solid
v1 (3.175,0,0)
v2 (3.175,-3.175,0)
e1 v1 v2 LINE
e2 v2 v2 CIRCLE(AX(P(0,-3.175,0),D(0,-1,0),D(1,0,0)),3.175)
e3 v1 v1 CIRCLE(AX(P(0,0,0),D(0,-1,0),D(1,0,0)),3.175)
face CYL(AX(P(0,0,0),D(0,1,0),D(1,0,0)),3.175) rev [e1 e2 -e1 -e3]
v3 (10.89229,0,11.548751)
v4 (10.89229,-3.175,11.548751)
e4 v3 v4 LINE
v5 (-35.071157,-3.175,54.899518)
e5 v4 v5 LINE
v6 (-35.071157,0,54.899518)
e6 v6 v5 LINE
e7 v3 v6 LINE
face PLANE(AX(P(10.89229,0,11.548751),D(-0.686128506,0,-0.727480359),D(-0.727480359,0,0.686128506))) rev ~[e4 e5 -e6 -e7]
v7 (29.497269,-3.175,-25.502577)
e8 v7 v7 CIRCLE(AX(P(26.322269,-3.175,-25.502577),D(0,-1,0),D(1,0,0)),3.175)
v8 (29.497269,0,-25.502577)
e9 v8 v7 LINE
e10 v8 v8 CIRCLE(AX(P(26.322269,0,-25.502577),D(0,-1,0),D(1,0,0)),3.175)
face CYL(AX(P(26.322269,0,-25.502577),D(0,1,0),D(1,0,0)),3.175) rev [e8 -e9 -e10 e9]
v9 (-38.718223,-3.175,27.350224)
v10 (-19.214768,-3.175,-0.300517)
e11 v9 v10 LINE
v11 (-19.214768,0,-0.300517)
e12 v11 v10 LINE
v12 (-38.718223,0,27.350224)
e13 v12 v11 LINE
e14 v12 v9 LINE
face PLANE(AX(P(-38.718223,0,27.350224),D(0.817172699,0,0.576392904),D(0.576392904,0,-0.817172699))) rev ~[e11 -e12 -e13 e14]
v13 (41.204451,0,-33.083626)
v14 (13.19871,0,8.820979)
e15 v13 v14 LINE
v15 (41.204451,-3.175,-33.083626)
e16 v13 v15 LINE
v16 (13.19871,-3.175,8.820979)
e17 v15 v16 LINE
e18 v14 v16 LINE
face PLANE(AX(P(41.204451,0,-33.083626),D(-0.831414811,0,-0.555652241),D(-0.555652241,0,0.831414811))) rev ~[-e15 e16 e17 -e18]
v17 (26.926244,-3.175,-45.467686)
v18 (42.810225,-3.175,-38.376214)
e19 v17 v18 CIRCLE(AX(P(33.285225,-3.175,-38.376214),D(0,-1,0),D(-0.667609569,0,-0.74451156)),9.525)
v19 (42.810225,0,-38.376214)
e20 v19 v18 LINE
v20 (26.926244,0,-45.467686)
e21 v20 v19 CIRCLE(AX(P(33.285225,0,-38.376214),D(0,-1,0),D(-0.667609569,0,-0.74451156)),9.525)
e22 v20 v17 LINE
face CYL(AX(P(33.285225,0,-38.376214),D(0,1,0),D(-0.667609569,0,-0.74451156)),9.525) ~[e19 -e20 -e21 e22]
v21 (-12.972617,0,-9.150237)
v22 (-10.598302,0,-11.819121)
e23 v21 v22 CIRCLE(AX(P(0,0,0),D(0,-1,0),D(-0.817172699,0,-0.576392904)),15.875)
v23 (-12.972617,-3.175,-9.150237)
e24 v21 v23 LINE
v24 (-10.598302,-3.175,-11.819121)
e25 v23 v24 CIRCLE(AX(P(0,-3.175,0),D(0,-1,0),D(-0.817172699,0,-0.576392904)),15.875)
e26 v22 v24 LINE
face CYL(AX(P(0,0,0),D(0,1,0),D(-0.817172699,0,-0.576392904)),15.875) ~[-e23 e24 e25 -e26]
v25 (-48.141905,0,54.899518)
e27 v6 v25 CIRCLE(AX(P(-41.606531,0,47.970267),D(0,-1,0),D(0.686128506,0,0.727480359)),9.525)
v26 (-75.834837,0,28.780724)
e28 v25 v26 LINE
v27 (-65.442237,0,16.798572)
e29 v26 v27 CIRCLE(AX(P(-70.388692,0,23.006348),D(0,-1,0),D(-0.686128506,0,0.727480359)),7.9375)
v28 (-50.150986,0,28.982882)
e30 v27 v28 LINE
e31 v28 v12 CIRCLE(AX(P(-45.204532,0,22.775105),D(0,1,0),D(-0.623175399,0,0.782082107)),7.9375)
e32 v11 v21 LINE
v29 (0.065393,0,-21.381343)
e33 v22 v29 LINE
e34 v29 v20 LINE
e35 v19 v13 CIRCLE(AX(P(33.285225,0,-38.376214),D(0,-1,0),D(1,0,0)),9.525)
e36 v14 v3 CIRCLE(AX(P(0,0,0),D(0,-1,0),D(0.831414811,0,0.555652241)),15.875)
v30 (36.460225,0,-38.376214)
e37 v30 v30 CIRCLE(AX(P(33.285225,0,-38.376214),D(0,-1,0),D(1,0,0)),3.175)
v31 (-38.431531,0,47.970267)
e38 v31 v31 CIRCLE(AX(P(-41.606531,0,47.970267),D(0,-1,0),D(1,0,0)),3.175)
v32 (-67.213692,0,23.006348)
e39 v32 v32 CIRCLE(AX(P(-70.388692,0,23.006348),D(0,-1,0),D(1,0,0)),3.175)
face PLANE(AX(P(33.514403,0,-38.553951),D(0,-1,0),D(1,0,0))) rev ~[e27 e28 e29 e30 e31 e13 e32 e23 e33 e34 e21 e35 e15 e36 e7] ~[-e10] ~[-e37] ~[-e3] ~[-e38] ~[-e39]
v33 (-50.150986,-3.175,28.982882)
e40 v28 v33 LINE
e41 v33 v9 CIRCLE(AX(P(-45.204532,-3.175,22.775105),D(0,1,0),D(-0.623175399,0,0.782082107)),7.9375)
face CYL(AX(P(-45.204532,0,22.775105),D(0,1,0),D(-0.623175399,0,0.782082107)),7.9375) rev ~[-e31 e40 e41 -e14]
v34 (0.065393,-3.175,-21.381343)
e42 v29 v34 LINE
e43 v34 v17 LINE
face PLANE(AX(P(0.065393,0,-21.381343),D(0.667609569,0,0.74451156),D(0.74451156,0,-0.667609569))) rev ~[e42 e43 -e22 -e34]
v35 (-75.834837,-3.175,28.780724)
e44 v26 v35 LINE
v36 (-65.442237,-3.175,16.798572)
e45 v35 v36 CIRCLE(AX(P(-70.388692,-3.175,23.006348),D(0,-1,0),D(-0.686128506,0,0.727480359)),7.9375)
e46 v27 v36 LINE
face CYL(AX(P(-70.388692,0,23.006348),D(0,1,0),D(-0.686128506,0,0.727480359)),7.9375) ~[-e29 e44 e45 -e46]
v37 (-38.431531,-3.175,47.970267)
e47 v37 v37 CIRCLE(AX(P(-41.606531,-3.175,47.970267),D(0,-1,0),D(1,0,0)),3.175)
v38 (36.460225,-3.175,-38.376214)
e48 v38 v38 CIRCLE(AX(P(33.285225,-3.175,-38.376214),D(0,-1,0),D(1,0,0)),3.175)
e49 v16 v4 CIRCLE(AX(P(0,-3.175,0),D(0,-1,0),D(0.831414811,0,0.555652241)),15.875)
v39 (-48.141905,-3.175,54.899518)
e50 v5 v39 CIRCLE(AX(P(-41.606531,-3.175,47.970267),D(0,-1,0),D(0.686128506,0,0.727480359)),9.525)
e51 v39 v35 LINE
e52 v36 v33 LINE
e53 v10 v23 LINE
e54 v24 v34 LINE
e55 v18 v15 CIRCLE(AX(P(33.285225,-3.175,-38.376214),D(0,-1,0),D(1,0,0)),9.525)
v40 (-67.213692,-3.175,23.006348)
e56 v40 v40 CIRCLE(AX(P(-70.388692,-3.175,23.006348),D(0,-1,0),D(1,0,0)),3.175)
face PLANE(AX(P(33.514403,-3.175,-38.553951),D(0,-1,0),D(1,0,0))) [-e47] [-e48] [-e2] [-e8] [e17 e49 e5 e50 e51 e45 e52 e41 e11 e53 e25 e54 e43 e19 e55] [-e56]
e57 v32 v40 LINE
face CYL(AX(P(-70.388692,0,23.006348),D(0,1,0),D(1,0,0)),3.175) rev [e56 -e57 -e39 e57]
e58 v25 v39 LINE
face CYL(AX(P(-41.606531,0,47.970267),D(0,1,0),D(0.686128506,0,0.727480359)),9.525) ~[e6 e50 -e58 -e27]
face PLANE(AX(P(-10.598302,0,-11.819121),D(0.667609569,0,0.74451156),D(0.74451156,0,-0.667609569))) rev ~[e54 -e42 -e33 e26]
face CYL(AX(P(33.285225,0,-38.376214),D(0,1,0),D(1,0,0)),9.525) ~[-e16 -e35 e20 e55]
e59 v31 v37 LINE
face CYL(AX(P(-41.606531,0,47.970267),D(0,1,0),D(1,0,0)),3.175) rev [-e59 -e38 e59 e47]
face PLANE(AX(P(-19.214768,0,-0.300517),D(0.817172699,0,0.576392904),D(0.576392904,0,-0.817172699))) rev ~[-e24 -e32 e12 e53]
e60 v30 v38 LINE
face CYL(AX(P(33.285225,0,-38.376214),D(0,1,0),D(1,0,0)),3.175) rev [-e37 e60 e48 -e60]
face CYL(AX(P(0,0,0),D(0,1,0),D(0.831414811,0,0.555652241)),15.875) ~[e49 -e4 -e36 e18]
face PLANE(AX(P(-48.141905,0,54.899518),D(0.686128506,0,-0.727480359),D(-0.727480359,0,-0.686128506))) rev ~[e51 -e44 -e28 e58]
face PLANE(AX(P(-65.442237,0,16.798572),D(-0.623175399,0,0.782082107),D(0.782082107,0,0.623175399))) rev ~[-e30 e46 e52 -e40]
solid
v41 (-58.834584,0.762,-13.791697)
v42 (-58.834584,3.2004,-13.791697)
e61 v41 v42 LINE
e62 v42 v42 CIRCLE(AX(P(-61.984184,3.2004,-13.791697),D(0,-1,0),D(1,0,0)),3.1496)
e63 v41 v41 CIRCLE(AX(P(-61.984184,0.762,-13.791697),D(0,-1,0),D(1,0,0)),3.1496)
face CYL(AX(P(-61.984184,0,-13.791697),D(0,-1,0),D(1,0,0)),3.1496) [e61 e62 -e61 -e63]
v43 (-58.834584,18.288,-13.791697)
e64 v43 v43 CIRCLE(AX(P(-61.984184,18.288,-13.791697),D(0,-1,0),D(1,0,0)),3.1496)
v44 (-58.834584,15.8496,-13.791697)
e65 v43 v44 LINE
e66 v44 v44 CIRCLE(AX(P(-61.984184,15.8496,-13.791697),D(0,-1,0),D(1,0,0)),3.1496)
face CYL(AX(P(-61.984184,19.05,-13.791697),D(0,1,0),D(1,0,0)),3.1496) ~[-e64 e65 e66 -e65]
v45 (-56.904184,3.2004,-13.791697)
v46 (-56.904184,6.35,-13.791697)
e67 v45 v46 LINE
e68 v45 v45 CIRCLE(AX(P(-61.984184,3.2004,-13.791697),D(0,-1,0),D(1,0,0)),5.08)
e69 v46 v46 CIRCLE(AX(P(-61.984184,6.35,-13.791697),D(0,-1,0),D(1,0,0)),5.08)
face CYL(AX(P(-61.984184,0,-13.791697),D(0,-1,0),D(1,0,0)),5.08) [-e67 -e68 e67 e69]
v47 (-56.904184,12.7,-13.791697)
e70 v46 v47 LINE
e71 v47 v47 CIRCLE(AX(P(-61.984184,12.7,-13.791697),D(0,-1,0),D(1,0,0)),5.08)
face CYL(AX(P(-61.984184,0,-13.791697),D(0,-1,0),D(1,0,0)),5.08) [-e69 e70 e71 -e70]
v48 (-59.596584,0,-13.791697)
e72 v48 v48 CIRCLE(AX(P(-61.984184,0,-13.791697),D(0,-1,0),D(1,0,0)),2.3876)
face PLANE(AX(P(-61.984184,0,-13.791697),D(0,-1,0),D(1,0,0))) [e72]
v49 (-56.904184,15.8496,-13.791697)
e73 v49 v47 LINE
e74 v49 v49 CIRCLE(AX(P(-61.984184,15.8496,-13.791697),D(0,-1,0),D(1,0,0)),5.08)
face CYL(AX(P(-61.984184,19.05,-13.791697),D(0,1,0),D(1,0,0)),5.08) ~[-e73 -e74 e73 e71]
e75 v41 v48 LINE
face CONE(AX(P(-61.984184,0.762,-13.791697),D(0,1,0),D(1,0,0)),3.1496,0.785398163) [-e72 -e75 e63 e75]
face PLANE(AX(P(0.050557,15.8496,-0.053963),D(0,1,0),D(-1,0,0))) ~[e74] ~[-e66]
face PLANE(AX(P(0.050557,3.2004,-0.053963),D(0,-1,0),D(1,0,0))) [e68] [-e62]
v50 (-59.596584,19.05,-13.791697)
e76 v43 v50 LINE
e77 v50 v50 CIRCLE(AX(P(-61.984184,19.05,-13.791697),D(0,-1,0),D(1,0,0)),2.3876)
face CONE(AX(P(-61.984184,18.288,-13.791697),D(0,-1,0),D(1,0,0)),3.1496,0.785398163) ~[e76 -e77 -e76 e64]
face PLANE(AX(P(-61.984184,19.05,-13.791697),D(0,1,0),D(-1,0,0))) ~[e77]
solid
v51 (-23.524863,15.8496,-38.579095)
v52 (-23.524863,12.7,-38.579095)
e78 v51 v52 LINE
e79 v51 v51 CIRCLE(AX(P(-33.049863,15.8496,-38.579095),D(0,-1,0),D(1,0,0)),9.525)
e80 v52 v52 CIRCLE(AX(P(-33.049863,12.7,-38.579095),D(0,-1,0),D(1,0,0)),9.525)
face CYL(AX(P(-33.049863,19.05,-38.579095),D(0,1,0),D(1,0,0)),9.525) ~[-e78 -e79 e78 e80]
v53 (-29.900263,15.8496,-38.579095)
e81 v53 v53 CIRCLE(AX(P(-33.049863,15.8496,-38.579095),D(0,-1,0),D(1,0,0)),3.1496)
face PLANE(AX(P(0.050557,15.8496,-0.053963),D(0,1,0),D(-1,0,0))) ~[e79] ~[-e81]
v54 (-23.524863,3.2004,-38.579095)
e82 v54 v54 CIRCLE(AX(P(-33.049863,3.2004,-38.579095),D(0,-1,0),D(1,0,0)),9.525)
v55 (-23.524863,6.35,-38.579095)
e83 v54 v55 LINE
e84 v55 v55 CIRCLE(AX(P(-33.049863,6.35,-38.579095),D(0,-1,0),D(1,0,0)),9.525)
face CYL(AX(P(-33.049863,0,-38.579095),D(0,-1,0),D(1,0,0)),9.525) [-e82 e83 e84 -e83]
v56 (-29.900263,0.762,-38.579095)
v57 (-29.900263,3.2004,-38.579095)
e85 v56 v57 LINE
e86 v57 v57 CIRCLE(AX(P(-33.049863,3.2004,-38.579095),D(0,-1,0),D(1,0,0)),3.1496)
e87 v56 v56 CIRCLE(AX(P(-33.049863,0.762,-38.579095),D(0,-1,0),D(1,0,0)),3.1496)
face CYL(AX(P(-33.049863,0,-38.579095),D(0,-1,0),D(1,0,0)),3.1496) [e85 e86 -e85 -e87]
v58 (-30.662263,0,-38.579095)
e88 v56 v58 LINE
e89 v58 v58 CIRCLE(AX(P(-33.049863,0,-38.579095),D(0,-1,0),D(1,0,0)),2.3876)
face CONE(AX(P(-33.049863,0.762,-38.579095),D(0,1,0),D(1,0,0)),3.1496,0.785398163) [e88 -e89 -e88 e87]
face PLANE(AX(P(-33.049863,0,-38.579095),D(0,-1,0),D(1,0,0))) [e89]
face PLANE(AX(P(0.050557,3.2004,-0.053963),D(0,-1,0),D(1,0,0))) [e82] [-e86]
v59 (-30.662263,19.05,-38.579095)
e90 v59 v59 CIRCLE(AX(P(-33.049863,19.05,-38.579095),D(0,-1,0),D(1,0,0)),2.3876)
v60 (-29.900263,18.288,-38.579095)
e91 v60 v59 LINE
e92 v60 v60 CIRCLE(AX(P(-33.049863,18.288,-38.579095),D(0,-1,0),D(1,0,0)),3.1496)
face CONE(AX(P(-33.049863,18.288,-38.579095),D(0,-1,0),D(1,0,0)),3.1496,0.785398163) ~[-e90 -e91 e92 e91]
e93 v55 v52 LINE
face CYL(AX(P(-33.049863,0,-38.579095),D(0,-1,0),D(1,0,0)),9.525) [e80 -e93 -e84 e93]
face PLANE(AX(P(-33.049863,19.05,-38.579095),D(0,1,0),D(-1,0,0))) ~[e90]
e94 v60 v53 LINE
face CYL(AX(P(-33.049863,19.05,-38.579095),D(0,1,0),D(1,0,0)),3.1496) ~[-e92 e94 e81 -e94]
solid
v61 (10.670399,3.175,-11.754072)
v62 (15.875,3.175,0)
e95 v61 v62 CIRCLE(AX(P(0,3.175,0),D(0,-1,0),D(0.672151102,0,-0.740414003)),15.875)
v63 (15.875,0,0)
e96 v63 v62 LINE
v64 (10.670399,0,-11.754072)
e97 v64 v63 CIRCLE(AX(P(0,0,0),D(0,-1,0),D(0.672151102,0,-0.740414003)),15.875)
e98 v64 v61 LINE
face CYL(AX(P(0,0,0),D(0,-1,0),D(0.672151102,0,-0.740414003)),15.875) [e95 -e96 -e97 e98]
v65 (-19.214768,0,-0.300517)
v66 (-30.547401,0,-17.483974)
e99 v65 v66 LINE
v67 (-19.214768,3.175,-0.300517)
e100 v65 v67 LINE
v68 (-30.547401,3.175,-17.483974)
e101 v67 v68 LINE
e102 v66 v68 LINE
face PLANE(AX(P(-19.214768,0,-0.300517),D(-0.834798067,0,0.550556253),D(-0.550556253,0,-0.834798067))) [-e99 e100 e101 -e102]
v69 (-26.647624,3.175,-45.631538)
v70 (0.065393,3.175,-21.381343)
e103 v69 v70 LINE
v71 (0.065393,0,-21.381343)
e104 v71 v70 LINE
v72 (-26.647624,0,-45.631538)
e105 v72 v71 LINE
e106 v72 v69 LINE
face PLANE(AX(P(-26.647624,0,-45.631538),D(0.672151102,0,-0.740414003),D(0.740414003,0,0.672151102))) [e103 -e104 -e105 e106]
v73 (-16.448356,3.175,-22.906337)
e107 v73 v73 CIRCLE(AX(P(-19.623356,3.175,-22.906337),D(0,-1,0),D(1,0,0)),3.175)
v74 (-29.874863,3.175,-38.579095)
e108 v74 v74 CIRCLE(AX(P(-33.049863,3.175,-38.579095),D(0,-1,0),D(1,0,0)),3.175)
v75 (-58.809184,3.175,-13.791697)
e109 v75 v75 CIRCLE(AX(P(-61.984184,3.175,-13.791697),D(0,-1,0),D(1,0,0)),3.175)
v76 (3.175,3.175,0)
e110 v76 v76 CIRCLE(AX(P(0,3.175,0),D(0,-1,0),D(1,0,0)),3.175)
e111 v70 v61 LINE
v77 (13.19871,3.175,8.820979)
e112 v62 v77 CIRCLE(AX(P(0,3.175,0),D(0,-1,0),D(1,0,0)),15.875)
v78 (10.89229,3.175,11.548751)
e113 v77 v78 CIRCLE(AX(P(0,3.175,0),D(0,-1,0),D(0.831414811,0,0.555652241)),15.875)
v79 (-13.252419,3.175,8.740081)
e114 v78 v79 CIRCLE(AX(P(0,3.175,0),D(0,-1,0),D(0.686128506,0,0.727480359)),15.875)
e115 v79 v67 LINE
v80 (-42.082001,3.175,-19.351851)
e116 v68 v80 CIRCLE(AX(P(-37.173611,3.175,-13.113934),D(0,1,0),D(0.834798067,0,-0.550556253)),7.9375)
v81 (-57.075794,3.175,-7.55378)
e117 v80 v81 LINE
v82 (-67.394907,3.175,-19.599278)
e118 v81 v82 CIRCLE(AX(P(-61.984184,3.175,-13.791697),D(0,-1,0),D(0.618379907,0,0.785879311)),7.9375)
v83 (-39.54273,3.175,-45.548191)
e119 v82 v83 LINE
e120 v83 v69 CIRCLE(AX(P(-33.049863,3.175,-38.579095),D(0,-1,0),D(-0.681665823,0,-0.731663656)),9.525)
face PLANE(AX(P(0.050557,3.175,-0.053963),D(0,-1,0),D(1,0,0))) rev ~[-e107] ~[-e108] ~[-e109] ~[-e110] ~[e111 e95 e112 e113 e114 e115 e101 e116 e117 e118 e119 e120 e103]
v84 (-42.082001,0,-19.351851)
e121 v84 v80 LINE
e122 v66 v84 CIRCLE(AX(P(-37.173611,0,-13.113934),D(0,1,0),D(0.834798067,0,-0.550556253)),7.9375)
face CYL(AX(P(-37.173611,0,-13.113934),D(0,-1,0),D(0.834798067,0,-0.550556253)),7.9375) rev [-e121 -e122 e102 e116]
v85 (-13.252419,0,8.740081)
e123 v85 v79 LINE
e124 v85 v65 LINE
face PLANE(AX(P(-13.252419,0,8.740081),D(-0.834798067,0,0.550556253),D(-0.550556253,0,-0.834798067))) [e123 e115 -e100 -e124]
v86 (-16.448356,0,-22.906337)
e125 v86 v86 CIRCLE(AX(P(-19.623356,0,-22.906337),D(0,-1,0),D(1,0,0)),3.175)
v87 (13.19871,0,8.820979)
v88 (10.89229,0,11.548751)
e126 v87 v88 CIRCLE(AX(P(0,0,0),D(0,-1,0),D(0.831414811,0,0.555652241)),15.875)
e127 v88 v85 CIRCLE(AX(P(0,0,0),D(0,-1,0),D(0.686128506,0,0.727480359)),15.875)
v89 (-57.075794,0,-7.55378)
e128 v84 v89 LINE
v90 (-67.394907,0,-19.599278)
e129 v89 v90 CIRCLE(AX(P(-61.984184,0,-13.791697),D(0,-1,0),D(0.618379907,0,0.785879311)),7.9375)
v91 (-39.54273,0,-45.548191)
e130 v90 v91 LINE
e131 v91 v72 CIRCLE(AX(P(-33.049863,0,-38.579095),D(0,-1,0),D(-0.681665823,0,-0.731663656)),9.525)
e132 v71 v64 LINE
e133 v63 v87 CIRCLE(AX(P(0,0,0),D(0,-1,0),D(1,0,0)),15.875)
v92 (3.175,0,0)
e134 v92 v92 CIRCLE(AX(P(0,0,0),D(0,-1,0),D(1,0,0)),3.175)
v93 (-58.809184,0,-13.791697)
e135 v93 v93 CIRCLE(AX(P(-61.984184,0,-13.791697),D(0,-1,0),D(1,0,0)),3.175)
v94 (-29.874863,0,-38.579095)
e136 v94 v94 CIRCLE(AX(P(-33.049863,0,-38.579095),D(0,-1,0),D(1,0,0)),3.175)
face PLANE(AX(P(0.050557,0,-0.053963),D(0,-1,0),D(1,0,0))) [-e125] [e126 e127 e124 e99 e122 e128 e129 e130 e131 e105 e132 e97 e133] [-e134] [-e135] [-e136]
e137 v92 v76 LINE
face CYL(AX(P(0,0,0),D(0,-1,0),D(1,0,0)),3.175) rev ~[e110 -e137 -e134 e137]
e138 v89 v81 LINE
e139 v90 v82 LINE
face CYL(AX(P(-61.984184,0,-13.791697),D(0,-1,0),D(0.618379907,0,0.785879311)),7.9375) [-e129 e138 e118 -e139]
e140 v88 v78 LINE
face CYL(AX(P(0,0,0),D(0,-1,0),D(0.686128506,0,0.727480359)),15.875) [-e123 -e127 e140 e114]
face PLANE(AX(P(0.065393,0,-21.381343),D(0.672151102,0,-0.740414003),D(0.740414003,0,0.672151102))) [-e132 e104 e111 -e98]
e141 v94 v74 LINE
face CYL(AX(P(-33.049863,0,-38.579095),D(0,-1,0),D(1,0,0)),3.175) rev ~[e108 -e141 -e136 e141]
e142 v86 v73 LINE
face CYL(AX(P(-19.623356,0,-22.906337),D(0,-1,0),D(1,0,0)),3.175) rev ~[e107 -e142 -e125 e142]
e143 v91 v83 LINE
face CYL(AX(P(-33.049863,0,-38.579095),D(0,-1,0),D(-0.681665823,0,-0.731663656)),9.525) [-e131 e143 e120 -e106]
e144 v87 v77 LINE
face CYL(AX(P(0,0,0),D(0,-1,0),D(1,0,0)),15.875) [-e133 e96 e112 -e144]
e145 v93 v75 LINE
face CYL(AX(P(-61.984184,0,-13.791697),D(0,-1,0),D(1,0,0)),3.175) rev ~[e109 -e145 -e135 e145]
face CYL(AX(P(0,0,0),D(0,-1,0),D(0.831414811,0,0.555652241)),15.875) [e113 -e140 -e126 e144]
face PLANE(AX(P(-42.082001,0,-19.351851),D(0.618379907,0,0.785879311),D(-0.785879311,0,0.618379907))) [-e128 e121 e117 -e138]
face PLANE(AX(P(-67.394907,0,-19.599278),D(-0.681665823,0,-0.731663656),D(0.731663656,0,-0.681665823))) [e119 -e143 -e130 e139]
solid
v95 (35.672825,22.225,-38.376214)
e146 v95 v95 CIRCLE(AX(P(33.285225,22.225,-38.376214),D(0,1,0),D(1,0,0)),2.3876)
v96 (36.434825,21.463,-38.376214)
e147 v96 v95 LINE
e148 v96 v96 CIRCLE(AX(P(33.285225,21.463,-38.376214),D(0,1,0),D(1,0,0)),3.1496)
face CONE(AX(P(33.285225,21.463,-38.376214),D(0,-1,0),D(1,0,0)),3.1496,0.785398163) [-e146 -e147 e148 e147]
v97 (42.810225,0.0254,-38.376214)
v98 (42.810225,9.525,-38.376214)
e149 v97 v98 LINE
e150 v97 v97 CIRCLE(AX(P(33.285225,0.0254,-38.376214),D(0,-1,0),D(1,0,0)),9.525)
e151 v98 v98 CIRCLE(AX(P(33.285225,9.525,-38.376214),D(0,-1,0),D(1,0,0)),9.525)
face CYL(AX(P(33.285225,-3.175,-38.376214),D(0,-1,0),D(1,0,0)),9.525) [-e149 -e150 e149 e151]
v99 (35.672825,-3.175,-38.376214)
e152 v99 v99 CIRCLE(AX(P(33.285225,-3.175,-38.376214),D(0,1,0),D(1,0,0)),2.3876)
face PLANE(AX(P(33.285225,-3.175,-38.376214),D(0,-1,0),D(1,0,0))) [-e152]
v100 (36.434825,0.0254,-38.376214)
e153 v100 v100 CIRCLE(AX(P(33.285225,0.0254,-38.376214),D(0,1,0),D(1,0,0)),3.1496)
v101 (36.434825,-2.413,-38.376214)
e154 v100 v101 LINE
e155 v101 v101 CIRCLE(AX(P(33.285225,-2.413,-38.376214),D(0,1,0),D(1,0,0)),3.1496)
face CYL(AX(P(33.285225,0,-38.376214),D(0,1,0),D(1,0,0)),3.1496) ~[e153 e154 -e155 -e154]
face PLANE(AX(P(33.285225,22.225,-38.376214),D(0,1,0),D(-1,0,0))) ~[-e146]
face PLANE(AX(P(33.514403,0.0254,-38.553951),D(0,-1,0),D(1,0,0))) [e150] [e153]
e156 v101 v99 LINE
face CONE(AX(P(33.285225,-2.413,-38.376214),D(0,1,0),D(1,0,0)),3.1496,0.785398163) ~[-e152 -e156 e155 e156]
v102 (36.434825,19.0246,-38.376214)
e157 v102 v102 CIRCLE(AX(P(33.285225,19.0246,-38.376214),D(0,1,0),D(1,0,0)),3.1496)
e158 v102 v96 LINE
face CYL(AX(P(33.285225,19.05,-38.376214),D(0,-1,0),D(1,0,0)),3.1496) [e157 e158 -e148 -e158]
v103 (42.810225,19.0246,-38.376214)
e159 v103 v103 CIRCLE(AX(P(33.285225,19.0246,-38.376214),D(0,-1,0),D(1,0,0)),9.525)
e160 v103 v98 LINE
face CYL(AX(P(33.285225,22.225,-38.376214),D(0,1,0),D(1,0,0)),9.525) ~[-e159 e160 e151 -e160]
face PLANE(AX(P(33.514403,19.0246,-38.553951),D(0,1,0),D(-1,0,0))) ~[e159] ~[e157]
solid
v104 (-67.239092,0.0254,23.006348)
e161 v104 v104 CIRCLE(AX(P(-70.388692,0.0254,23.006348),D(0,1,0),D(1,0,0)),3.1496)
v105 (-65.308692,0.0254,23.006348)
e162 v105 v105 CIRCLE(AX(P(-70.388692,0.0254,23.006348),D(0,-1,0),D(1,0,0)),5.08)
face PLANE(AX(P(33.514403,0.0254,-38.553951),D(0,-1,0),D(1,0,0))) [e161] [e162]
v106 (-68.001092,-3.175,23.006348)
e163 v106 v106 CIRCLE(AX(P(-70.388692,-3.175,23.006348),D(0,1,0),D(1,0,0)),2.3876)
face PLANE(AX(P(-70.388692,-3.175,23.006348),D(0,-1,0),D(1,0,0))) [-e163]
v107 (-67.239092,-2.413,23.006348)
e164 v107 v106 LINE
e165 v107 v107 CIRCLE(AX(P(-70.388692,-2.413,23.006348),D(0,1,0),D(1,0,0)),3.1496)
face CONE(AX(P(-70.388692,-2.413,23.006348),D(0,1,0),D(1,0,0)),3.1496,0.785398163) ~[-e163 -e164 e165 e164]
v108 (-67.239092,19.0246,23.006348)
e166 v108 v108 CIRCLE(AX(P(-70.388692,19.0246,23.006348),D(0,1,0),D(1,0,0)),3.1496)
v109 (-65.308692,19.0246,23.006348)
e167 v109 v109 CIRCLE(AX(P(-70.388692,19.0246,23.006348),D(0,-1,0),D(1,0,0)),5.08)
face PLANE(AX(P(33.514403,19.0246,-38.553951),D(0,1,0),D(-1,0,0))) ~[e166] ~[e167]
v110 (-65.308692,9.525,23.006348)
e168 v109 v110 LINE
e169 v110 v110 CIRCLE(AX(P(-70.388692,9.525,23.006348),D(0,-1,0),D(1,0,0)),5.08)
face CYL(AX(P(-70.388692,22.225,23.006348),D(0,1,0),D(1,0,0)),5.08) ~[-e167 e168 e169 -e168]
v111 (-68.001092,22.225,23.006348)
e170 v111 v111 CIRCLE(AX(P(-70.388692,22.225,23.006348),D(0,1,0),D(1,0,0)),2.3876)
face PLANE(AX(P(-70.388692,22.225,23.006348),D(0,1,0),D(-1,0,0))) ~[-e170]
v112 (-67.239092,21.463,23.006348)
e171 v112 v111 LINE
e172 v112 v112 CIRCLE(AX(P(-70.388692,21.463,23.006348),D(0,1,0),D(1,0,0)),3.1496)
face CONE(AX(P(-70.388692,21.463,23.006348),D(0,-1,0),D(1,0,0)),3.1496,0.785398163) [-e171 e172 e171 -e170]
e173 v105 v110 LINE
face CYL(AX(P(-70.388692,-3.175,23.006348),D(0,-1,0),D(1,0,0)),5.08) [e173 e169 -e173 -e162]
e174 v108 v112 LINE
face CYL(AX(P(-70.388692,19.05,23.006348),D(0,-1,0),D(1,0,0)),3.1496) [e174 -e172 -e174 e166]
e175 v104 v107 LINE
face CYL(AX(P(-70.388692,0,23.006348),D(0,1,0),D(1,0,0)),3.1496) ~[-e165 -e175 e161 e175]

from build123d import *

# Parameters (mm, degrees)
F0_R      = 3.175
F0_R_2    = 3.96875
F2_DEPTH  = 3.175
F3_DEPTH  = 3.175
F4_R      = 9.525
F6_DEPTH  = 12.7
F4_R_2    = 5.08
F5_R      = 9.525
F5_R_2    = 5.08
F7_OFFSET = 0.0254
F8_SIZE   = 0.762
F8_2_SIZE = 0.762
F8_3_SIZE = 0.762
F8_4_SIZE = 0.762


with BuildPart() as f2:
    # F0 (on Front) → F2 (new body)
    with BuildSketch(Plane.XZ):
        with BuildLine():
            ThreePointArc((26.9262440233, -45.4676864135), (37.1682864336, -47.0737686401), (42.8102251661, -38.3762138003))
            ThreePointArc((42.8102251661, -38.3762138003), (42.3999454948, -35.6108027404), (41.2044512386, -33.0836262089))
            ThreePointArc((41.2044512386, -33.0836262089), (27.0442454474, -31.1806737127), (26.9262440233, -45.4676864135))
        make_face()
        with Locations((33.2852251661, -38.3762138003)):
            Circle(F0_R, mode=Mode.SUBTRACT)
        with BuildLine():
            ThreePointArc((-32.0815314576, 47.9702672503), (-32.8608164346, 51.7436071154), (-35.0711574392, 54.8995176744))
            ThreePointArc((-35.0711574392, 54.8995176744), (-41.6065314576, 57.4952672503), (-48.1419054761, 54.8995176744))
            ThreePointArc((-48.1419054761, 54.8995176744), (-45.3798713227, 39.2245522274), (-32.0815314576, 47.9702672503))
        make_face()
        with Locations((-41.6065314576, 47.9702672503)):
            Circle(F0_R, mode=Mode.SUBTRACT)
        with BuildLine():
            ThreePointArc((-62.4511918078, 23.0063483758), (-67.2442419203, 30.2944442282), (-75.8348368232, 28.7807237291))
            ThreePointArc((-75.8348368232, 28.7807237291), (-76.3849752141, 17.8055319436), (-65.4422370763, 16.798571653))
            ThreePointArc((-65.4422370763, 16.798571653), (-63.237943921, 19.5609585706), (-62.4511918078, 23.0063483758))
        make_face()
        with Locations((-70.3886918078, 23.0063483758)):
            Circle(F0_R, mode=Mode.SUBTRACT)
        with BuildLine():
            ThreePointArc((-12.9726166036, -9.1502373442), (-15.8730587934, -0.2482529814), (-13.2524193062, 8.7400805221))
            Line((-13.2524193062, 8.7400805221), (-19.2147683858, -0.3005169703))
            Line((-19.2147683858, -0.3005169703), (-12.9726166036, -9.1502373442))
        make_face()
        with BuildLine():
            Line((-10.5983019047, -11.8191210221), (0.0653932355, -21.3813431455))
            Line((0.0653932355, -21.3813431455), (10.6703987497, -11.7540722953))
            ThreePointArc((10.6703987497, -11.7540722953), (0.0485522706, -15.8749257534), (-10.5983019047, -11.8191210221))
        make_face()
        with BuildLine():
            ThreePointArc((26.9262440233, -45.4676864135), (27.0442454474, -31.1806737127), (41.2044512386, -33.0836262089))
            Line((41.2044512386, -33.0836262089), (13.1987101208, 8.820979319))
            ThreePointArc((13.1987101208, 8.820979319), (15.1912005478, 4.609018433), (15.875, 0))
            ThreePointArc((15.875, 0), (14.5156502636, -6.4274040191), (10.6703987497, -11.7540722953))
            Line((10.6703987497, -11.7540722953), (0.0653932355, -21.3813431455))
            Line((0.0653932355, -21.3813431455), (26.9262440233, -45.4676864135))
        make_face()
        with Locations((26.3222689506, -25.5025770961)):
            Circle(F0_R, mode=Mode.SUBTRACT)
        with BuildLine():
            ThreePointArc((-13.2524193062, 8.7400805221), (-1.834314477, 15.7686687897), (10.8922900307, 11.5487507067))
            Line((10.8922900307, 11.5487507067), (-35.0711574392, 54.8995176744))
            ThreePointArc((-35.0711574392, 54.8995176744), (-32.8608164346, 51.7436071154), (-32.0815314576, 47.9702672503))
            ThreePointArc((-32.0815314576, 47.9702672503), (-45.3798713227, 39.2245522274), (-48.1419054761, 54.8995176744))
            Line((-48.1419054761, 54.8995176744), (-75.8348368232, 28.7807237291))
            ThreePointArc((-75.8348368232, 28.7807237291), (-67.2442419203, 30.2944442282), (-62.4511918078, 23.0063483758))
            ThreePointArc((-62.4511918078, 23.0063483758), (-63.237943921, 19.5609585706), (-65.4422370763, 16.798571653))
            Line((-65.4422370763, 16.798571653), (-50.1509863937, 28.9828821829))
            ThreePointArc((-50.1509863937, 28.9828821829), (-44.0823996147, 30.6328866939), (-38.7182233604, 27.3502241323))
            Line((-38.7182233604, 27.3502241323), (-19.2147683858, -0.3005169703))
            Line((-19.2147683858, -0.3005169703), (-13.2524193062, 8.7400805221))
        make_face()
        with BuildLine():
            ThreePointArc((15.875, 0), (15.1912005478, 4.609018433), (13.1987101208, 8.820979319))
            ThreePointArc((13.1987101208, 8.820979319), (12.1224690662, 10.2499448164), (10.8922900307, 11.5487507067))
            ThreePointArc((10.8922900307, 11.5487507067), (-1.834314477, 15.7686687897), (-13.2524193062, 8.7400805221))
            ThreePointArc((-13.2524193062, 8.7400805221), (-15.8730587934, -0.2482529814), (-12.9726166036, -9.1502373442))
            ThreePointArc((-12.9726166036, -9.1502373442), (-11.8607666217, -10.5516747555), (-10.5983019047, -11.8191210221))
            ThreePointArc((-10.5983019047, -11.8191210221), (0.0485522706, -15.8749257534), (10.6703987497, -11.7540722953))
            ThreePointArc((10.6703987497, -11.7540722953), (14.5156502636, -6.4274040191), (15.875, 0))
        make_face()
        Circle(F0_R_2, mode=Mode.SUBTRACT)
        Circle(F0_R_2)
        Circle(F0_R, mode=Mode.SUBTRACT)
    extrude(amount=F2_DEPTH)


with BuildPart() as f3:
    # F0 (on Front) → F3 (new body)
    with BuildSketch(Plane.XZ):
        with BuildLine():
            ThreePointArc((15.875, 0), (15.1912005478, 4.609018433), (13.1987101208, 8.820979319))
            ThreePointArc((13.1987101208, 8.820979319), (12.1224690662, 10.2499448164), (10.8922900307, 11.5487507067))
            ThreePointArc((10.8922900307, 11.5487507067), (-1.834314477, 15.7686687897), (-13.2524193062, 8.7400805221))
            ThreePointArc((-13.2524193062, 8.7400805221), (-15.8730587934, -0.2482529814), (-12.9726166036, -9.1502373442))
            ThreePointArc((-12.9726166036, -9.1502373442), (-11.8607666217, -10.5516747555), (-10.5983019047, -11.8191210221))
            ThreePointArc((-10.5983019047, -11.8191210221), (0.0485522706, -15.8749257534), (10.6703987497, -11.7540722953))
            ThreePointArc((10.6703987497, -11.7540722953), (14.5156502636, -6.4274040191), (15.875, 0))
        make_face()
        Circle(F0_R_2, mode=Mode.SUBTRACT)
        with BuildLine():
            ThreePointArc((-12.9726166036, -9.1502373442), (-15.8730587934, -0.2482529814), (-13.2524193062, 8.7400805221))
            Line((-13.2524193062, 8.7400805221), (-19.2147683858, -0.3005169703))
            Line((-19.2147683858, -0.3005169703), (-12.9726166036, -9.1502373442))
        make_face()
        with BuildLine():
            Line((-10.5983019047, -11.8191210221), (0.0653932355, -21.3813431455))
            Line((0.0653932355, -21.3813431455), (10.6703987497, -11.7540722953))
            ThreePointArc((10.6703987497, -11.7540722953), (0.0485522706, -15.8749257534), (-10.5983019047, -11.8191210221))
        make_face()
        with BuildLine():
            ThreePointArc((-39.5427300894, -45.5481910186), (-33.1114263313, -48.1038957423), (-26.647623873, -45.6315380732))
            ThreePointArc((-26.647623873, -45.6315380732), (-24.3404729646, -42.4355371074), (-23.5248631228, -38.579094696))
            ThreePointArc((-23.5248631228, -38.579094696), (-36.849933329, -29.8449609995), (-39.5427300894, -45.5481910186))
        make_face()
        with Locations((-33.0498631228, -38.579094696)):
            Circle(F0_R, mode=Mode.SUBTRACT)
        with BuildLine():
            ThreePointArc((-57.0757936348, -7.5537803256), (-68.0121676911, -8.627656241), (-67.394906617, -19.5992776228))
            ThreePointArc((-67.394906617, -19.5992776228), (-58.817458973, -21.070142101), (-54.0466841448, -13.7916973539))
            ThreePointArc((-54.0466841448, -13.7916973539), (-54.8440071189, -10.3244537385), (-57.0757936348, -7.5537803256))
        make_face()
        with Locations((-61.9841841448, -13.7916973539)):
            Circle(F0_R, mode=Mode.SUBTRACT)
        with BuildLine():
            Line((-26.647623873, -45.6315380732), (0.0653932355, -21.3813431455))
            Line((0.0653932355, -21.3813431455), (-10.5983019047, -11.8191210221))
            ThreePointArc((-10.5983019047, -11.8191210221), (-11.8607666217, -10.5516747555), (-12.9726166036, -9.1502373442))
            Line((-12.9726166036, -9.1502373442), (-19.2147683858, -0.3005169703))
            Line((-19.2147683858, -0.3005169703), (-30.5474012326, -17.4839744853))
            ThreePointArc((-30.5474012326, -17.4839744853), (-35.9047663103, -20.9493627188), (-42.0820013957, -19.3518512525))
            Line((-42.0820013957, -19.3518512525), (-57.0757936348, -7.5537803256))
            ThreePointArc((-57.0757936348, -7.5537803256), (-54.8440071189, -10.3244537385), (-54.0466841448, -13.7916973539))
            ThreePointArc((-54.0466841448, -13.7916973539), (-58.817458973, -21.070142101), (-67.394906617, -19.5992776228))
            Line((-67.394906617, -19.5992776228), (-39.5427300894, -45.5481910186))
            ThreePointArc((-39.5427300894, -45.5481910186), (-36.849933329, -29.8449609995), (-23.5248631228, -38.579094696))
            ThreePointArc((-23.5248631228, -38.579094696), (-24.3404729646, -42.4355371074), (-26.647623873, -45.6315380732))
        make_face()
        with Locations((-19.6233562292, -22.9063374758)):
            Circle(F0_R, mode=Mode.SUBTRACT)
        Circle(F0_R_2)
        Circle(F0_R, mode=Mode.SUBTRACT)
    extrude(amount=-F3_DEPTH)


with BuildPart() as f6:
    # F4 (on face) → F6 (new body, through all)
    with BuildSketch(Plane.XZ.offset(3.175)):
        with Locations((33.2852251661, -38.3762138003)):
            Circle(F4_R)
    extrude(amount=-F6_DEPTH)

    # F7: cut F2, F3, each made larger all round first
    f7_tool = offset(f2.part, amount=F7_OFFSET, kind=Kind.INTERSECTION, mode=Mode.PRIVATE)
    add(f7_tool, mode=Mode.SUBTRACT)
    f7_tool1 = offset(f3.part, amount=F7_OFFSET, kind=Kind.INTERSECTION, mode=Mode.PRIVATE)
    add(f7_tool1, mode=Mode.SUBTRACT)

    # F8#4
    f8_4_edges = [f6.edges().sort_by_distance(p)[0] for p in [
        (30.135625, -3.175, -38.376214),
    ]]
    chamfer(f8_4_edges, length=F8_4_SIZE)



with BuildPart() as f6b:
    # F4 (on face) → F6, piece 2 (new body, through all)
    with BuildSketch(Plane.XZ.offset(3.175)):
        with Locations((-70.3886918078, 23.0063483758)):
            Circle(F4_R_2)
    extrude(amount=-F6_DEPTH)

    # F7: cut F2, F3, each made larger all round first
    f7_tool = offset(f2.part, amount=F7_OFFSET, kind=Kind.INTERSECTION, mode=Mode.PRIVATE)
    add(f7_tool, mode=Mode.SUBTRACT)
    f7_tool1 = offset(f3.part, amount=F7_OFFSET, kind=Kind.INTERSECTION, mode=Mode.PRIVATE)
    add(f7_tool1, mode=Mode.SUBTRACT)

    # F8
    f8_edges = [f6b.edges().sort_by_distance(p)[0] for p in [
        (-73.538292, -3.175, 23.006348),
    ]]
    chamfer(f8_edges, length=F8_SIZE)


with BuildPart() as f6c:
    # F5 (on face) → F6, piece 3 (new body, through all)
    with BuildSketch(Plane.XZ):
        with Locations((-33.0498631228, -38.579094696)):
            Circle(F5_R)
    extrude(amount=-F6_DEPTH)

    # F7: cut F2, F3, each made larger all round first
    f7_tool = offset(f2.part, amount=F7_OFFSET, kind=Kind.INTERSECTION, mode=Mode.PRIVATE)
    add(f7_tool, mode=Mode.SUBTRACT)
    f7_tool1 = offset(f3.part, amount=F7_OFFSET, kind=Kind.INTERSECTION, mode=Mode.PRIVATE)
    add(f7_tool1, mode=Mode.SUBTRACT)

    # F8#2
    f8_2_edges = [f6c.edges().sort_by_distance(p)[0] for p in [
        (-36.199463, 0, -38.579095),
    ]]
    chamfer(f8_2_edges, length=F8_2_SIZE)


with BuildPart() as f6d:
    # F5 (on face) → F6, piece 4 (new body, through all)
    with BuildSketch(Plane.XZ):
        with Locations((-61.9841841448, -13.7916973539)):
            Circle(F5_R_2)
    extrude(amount=-F6_DEPTH)

    # F7: cut F2, F3, each made larger all round first
    f7_tool = offset(f2.part, amount=F7_OFFSET, kind=Kind.INTERSECTION, mode=Mode.PRIVATE)
    add(f7_tool, mode=Mode.SUBTRACT)
    f7_tool1 = offset(f3.part, amount=F7_OFFSET, kind=Kind.INTERSECTION, mode=Mode.PRIVATE)
    add(f7_tool1, mode=Mode.SUBTRACT)

    # F8#3
    f8_3_edges = [f6d.edges().sort_by_distance(p)[0] for p in [
        (-65.133784, 0, -13.791697),
    ]]
    chamfer(f8_3_edges, length=F8_3_SIZE)


with BuildPart() as f6_1:
    add(f6.part)

    add(f6b.part)  # F9 merges F6b

    add(f6c.part)  # F9 merges F6c

    add(f6d.part)  # F9 merges F6d
    # F9: F6d, F6c, F6b, F6 across plane
    add(f6d.part.mirror(Plane.XZ.offset(-9.525)))
    add(f6c.part.mirror(Plane.XZ.offset(-9.525)))
    add(f6b.part.mirror(Plane.XZ.offset(-9.525)))
    add(f6.part.mirror(Plane.XZ.offset(-9.525)))


solid = Compound([f2.part, f3.part, f6_1.part])
